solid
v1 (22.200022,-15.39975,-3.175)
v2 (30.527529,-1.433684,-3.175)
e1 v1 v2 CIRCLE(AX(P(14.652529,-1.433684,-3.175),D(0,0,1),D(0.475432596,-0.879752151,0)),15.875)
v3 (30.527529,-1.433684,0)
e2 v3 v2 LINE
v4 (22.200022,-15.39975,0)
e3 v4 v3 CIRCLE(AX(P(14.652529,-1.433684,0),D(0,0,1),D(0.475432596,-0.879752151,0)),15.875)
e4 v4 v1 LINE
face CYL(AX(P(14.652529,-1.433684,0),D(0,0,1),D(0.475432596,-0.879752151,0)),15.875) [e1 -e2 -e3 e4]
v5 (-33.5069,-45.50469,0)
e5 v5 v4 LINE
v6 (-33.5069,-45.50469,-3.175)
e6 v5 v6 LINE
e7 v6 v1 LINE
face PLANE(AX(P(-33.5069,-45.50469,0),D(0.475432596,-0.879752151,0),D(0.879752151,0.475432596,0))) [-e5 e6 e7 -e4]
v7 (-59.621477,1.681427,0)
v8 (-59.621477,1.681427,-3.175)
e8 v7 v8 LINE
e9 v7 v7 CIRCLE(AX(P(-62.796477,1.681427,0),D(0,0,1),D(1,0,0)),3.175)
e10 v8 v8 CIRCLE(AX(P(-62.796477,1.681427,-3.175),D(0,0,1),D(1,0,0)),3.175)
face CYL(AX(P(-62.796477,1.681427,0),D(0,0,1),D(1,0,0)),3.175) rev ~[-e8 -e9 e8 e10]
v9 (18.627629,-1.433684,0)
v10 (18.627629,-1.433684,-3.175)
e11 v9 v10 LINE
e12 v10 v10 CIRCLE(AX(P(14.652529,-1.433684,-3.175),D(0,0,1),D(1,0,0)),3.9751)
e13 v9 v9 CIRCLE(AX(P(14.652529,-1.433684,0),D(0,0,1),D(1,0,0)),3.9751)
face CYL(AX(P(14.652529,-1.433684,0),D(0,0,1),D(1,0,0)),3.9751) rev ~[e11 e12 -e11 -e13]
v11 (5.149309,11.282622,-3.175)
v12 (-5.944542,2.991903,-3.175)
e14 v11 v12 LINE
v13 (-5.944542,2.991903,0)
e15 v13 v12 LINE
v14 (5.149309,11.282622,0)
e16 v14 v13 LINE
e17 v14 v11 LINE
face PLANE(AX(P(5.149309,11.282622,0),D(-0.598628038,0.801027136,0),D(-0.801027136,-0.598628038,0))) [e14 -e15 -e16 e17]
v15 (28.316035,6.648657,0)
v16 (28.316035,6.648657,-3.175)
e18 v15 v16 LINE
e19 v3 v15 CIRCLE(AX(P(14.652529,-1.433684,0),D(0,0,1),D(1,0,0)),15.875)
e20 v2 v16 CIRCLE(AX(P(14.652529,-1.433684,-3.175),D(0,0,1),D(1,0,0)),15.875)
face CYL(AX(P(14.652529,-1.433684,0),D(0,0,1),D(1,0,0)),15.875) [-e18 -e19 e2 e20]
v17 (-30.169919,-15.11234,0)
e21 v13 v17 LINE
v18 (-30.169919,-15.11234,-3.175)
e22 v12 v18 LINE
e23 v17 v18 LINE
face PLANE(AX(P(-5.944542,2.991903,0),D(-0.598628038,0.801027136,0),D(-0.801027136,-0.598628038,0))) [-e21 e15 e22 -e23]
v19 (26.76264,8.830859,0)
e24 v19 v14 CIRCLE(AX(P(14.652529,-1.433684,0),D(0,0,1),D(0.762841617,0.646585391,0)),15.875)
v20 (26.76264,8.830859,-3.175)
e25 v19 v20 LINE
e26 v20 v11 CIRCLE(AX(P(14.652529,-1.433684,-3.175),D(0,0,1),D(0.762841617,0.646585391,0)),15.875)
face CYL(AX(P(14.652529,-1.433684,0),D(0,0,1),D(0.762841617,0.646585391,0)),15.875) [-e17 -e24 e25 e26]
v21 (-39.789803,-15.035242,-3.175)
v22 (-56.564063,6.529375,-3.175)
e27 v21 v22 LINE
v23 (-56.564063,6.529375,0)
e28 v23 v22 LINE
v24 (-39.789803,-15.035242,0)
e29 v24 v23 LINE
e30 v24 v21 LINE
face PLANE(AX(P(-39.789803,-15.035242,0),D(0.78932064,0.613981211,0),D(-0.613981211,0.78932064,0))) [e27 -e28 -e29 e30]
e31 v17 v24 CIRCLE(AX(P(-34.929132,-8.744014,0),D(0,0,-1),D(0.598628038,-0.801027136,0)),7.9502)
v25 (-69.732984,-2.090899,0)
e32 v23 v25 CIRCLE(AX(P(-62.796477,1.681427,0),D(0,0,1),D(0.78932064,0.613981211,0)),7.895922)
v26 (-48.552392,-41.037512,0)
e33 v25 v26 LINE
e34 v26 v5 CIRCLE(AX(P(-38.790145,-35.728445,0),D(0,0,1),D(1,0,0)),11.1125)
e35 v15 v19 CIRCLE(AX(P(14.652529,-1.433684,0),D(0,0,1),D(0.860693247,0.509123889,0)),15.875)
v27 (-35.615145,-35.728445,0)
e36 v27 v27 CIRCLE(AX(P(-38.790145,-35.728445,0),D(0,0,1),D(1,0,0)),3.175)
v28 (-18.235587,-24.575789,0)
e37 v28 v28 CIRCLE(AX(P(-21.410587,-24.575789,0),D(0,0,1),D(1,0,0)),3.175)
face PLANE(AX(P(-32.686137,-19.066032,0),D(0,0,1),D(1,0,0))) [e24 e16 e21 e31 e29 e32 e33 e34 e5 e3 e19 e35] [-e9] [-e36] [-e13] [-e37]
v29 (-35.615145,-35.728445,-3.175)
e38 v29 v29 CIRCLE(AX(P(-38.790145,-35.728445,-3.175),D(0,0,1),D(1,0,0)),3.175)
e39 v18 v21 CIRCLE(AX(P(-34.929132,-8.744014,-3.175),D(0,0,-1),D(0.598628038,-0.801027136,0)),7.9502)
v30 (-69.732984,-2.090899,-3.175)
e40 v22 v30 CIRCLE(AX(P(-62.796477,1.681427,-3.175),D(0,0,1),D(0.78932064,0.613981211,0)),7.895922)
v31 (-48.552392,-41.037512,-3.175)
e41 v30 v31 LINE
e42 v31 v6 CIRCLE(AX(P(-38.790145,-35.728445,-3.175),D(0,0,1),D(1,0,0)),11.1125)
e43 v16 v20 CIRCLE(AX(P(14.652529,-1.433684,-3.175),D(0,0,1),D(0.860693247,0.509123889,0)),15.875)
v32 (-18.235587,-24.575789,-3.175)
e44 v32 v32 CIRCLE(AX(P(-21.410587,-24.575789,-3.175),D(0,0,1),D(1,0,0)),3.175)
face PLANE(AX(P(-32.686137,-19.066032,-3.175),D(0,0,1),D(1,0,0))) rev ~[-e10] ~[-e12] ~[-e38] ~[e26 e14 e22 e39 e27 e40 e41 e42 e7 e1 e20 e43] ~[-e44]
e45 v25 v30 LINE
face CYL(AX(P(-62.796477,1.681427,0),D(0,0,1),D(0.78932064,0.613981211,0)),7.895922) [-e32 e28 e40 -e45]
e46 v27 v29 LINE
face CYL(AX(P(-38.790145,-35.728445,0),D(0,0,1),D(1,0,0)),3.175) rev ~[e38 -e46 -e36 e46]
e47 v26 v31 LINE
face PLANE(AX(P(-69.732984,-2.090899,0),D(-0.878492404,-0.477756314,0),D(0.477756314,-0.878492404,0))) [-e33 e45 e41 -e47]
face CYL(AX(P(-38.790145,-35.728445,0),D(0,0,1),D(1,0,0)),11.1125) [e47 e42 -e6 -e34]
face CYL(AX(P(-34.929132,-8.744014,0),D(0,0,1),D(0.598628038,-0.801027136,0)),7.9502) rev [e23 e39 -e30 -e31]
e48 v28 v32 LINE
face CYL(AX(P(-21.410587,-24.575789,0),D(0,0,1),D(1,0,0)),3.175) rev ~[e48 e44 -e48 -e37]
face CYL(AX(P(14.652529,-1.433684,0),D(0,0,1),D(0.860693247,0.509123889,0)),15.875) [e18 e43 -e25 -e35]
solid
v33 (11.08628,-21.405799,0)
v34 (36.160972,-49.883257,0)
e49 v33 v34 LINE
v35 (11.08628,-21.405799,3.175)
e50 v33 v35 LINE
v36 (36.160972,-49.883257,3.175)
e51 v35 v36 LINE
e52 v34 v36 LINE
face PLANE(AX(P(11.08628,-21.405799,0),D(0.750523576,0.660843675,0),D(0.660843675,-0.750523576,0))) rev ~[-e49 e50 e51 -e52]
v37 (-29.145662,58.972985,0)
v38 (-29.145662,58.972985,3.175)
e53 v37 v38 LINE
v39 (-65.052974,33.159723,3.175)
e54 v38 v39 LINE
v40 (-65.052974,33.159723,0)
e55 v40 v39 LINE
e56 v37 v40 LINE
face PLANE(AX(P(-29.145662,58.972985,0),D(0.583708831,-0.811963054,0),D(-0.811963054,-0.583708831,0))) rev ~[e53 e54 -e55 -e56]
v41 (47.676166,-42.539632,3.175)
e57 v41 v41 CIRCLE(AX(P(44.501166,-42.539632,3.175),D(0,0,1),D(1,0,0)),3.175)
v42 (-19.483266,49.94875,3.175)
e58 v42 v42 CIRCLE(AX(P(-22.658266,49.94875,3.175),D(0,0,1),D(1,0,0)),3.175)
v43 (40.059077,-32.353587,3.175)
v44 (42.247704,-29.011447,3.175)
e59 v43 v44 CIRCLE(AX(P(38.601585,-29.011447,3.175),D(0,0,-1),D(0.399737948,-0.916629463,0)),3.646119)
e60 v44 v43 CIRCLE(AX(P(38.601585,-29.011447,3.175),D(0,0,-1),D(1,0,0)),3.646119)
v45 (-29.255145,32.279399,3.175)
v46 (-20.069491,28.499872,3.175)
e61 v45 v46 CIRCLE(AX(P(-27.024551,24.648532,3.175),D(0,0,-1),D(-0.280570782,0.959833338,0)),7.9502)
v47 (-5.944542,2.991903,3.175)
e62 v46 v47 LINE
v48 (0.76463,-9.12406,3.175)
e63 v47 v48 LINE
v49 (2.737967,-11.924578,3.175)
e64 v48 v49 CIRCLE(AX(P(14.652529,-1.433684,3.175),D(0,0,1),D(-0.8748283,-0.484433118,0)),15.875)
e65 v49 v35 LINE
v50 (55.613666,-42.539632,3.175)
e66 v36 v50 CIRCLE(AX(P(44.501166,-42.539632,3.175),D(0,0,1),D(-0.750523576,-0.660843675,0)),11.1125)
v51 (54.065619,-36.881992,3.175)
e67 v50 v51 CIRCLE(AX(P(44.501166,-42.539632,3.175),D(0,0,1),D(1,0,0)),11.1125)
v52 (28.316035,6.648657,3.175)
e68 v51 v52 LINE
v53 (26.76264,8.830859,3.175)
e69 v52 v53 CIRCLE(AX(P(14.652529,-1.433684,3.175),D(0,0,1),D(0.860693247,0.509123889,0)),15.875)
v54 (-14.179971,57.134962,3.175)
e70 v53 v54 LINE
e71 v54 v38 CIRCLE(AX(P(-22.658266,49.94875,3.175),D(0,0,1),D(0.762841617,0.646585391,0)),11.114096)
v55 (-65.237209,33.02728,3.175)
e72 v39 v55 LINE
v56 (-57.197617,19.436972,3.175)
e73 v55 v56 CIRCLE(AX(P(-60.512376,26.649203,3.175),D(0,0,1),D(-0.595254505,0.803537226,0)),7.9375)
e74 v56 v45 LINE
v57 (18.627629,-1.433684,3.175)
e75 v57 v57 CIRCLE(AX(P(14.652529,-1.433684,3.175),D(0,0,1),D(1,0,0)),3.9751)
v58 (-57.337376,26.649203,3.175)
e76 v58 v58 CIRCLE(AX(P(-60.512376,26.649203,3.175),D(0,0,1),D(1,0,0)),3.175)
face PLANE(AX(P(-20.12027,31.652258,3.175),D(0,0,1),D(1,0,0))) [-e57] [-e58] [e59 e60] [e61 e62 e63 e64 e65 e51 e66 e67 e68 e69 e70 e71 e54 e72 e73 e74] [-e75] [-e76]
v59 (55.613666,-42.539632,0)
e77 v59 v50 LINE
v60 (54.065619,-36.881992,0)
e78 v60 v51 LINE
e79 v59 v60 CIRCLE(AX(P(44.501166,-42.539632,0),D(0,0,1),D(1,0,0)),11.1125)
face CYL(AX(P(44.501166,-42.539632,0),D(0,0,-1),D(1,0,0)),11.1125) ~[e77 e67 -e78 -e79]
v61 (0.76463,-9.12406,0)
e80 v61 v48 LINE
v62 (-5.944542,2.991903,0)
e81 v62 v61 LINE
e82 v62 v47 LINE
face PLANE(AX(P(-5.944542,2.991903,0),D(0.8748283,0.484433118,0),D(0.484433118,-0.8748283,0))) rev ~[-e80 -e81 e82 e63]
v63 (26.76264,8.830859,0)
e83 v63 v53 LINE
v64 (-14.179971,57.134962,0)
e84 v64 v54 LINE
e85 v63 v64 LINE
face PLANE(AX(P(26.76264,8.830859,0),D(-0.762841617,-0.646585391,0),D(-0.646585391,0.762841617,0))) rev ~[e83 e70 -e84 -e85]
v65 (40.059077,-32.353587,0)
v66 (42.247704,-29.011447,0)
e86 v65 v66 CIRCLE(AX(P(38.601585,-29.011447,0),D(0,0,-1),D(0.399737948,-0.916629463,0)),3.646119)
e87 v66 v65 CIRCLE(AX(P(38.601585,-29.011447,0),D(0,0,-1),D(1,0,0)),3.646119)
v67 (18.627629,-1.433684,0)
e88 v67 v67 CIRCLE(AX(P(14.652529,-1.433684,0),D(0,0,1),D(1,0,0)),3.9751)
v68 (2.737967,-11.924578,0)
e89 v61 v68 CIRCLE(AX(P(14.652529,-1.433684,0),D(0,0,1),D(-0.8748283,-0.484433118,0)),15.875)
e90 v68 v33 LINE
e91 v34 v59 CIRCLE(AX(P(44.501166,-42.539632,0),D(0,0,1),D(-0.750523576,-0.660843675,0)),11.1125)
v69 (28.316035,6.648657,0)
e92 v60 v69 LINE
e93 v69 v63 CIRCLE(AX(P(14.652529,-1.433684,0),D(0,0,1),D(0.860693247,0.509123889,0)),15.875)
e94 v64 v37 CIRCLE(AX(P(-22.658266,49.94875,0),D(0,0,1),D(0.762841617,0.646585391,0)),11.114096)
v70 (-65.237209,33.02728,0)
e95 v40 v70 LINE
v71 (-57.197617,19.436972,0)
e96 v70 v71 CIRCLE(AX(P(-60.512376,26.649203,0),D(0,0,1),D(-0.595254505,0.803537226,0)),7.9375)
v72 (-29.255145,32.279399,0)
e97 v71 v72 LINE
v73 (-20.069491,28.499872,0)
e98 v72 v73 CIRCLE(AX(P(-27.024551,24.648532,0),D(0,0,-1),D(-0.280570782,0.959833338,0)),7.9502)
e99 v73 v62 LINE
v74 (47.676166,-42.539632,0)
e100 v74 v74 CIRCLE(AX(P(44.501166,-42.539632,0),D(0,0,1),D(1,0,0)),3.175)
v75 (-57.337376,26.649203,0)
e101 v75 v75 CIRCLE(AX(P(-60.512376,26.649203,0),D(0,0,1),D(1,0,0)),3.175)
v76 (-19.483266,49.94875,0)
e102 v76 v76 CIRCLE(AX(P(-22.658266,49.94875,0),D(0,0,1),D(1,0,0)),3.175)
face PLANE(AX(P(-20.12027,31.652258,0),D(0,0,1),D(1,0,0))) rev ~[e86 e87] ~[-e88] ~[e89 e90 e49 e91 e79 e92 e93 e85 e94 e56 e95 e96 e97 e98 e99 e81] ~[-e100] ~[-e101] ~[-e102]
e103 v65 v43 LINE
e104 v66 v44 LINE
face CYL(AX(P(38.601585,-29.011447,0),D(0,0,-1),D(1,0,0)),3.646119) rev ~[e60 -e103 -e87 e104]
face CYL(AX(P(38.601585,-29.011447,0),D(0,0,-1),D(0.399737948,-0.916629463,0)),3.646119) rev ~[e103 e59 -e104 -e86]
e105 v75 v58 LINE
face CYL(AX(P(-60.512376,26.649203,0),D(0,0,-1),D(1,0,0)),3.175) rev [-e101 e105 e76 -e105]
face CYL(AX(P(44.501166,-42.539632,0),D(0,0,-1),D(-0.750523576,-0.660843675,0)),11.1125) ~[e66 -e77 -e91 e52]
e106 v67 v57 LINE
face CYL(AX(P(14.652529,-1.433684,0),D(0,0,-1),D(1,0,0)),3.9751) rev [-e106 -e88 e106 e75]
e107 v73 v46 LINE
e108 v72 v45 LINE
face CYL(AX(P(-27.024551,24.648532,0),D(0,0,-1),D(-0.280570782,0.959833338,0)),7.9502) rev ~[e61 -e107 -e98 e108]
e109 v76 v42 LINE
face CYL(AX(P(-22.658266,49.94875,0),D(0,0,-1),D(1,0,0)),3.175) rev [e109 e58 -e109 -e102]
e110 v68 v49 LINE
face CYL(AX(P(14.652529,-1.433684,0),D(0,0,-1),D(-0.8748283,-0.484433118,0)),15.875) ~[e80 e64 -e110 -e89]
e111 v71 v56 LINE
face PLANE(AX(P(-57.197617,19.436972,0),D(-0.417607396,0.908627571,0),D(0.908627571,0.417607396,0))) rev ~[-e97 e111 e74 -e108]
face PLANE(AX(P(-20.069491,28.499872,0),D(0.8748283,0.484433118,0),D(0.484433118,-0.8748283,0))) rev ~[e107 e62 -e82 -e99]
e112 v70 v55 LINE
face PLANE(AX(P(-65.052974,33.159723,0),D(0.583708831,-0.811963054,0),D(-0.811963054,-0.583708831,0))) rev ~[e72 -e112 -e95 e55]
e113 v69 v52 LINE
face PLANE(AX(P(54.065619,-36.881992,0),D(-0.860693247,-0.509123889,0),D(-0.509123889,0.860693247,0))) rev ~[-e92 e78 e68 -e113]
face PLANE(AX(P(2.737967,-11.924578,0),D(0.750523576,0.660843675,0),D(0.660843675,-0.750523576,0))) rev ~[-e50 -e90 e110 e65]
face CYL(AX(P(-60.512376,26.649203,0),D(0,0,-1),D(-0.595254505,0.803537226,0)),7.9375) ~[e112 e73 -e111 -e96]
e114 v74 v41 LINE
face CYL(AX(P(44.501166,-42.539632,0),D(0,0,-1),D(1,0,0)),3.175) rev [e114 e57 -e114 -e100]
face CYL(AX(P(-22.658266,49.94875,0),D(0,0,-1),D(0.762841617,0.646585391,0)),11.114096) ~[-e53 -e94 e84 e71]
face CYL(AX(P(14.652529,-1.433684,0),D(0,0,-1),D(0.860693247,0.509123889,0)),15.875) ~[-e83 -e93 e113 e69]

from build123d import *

# Parameters (mm, degrees)
F0_R     = 3.9751
F0_R_2   = 3.175
F1_DEPTH = 3.175
F2_DEPTH = 3.175


# Not quite as in the source:
# - a feature names something its author has since deleted; it is built from what else it names


with BuildPart() as f1:
    # F0 (on Top) → F1 (new body)
    with BuildSketch(Plane.XY):
        with BuildLine():
            ThreePointArc((-52.5748759492, 26.6492032122), (-53.8297565711, 22.3659212349), (-57.1976172398, 19.436971869))
            Line((-57.1976172398, 19.436971869), (-29.2551448321, 32.2793987644))
            ThreePointArc((-29.2551448321, 32.2793987644), (-23.9994310398, 32.0006966991), (-20.0694910529, 28.4998719382))
            Line((-20.0694910529, 28.4998719382), (-5.944542276, 2.9919030157))
            Line((-5.944542276, 2.9919030157), (5.1493091314, 11.2826215199))
            ThreePointArc((5.1493091314, 11.2826215199), (16.4418739956, 14.3401507274), (26.7626398944, 8.830858819))
            Line((26.7626398944, 8.830858819), (-14.1799710904, 57.1349621747))
            ThreePointArc((-14.1799710904, 57.1349621747), (-12.2239065675, 53.7759255754), (-11.5441699975, 49.9487499211))
            ThreePointArc((-11.5441699975, 49.9487499211), (-27.7288475633, 40.0587377986), (-29.1456623364, 58.9729854334))
            Line((-29.1456623364, 58.9729854334), (-65.0529744577, 33.1597232709))
            ThreePointArc((-65.0529744577, 33.1597232709), (-56.8406661575, 33.6864223686), (-52.5748759492, 26.6492032122))
        make_face()
        with BuildLine():
            Line((54.0656193027, -36.8819923981), (28.3160345311, 6.6486574689))
            ThreePointArc((28.3160345311, 6.6486574689), (29.9646775383, 2.7560340053), (30.5275292295, -1.4336842631))
            ThreePointArc((30.5275292295, -1.4336842631), (28.2876322337, -9.5638497635), (22.2000216938, -15.3997496539))
            Line((22.2000216938, -15.3997496539), (11.0862799953, -21.4057992729))
            Line((11.0862799953, -21.4057992729), (36.1609723562, -49.8832569445))
            ThreePointArc((36.1609723562, -49.8832569445), (33.6536306121, -40.1274456475), (40.059076729, -32.3535870991))
            ThreePointArc((40.059076729, -32.3535870991), (47.9196841374, -31.9660141026), (54.0656193027, -36.8819923981))
        make_face()
        with BuildLine():
            ThreePointArc((42.2477037346, -29.0114467929), (41.6518612023, -31.0089446024), (40.059076729, -32.3535870991))
            ThreePointArc((40.059076729, -32.3535870991), (35.5513078202, -27.0139489834), (42.2477037346, -29.0114467929))
        make_face(mode=Mode.SUBTRACT)
        with BuildLine():
            ThreePointArc((28.3160345311, 6.6486574689), (27.5854454003, 7.7725801433), (26.7626398944, 8.830858819))
            ThreePointArc((26.7626398944, 8.830858819), (16.4418739956, 14.3401507274), (5.1493091314, 11.2826215199))
            ThreePointArc((5.1493091314, 11.2826215199), (-0.8682400489, 1.9011839514), (0.7646299709, -9.1240600136))
            ThreePointArc((0.7646299709, -9.1240600136), (1.6755313717, -10.5777069884), (2.7379674647, -11.9245775975))
            ThreePointArc((2.7379674647, -11.9245775975), (11.8620044089, -17.0614990888), (22.2000216938, -15.3997496539))
            ThreePointArc((22.2000216938, -15.3997496539), (28.2876322337, -9.5638497635), (30.5275292295, -1.4336842631))
            ThreePointArc((30.5275292295, -1.4336842631), (29.9646775383, 2.7560340053), (28.3160345311, 6.6486574689))
        make_face()
        with Locations((14.6525292295, -1.4336842631)):
            Circle(F0_R, mode=Mode.SUBTRACT)
        with BuildLine():
            ThreePointArc((55.6136655916, -42.5396316105), (55.2196694077, -39.6068288226), (54.0656193027, -36.8819923981))
            ThreePointArc((54.0656193027, -36.8819923981), (47.9196841374, -31.9660141026), (40.059076729, -32.3535870991))
            ThreePointArc((40.059076729, -32.3535870991), (33.6536306121, -40.1274456475), (36.1609723562, -49.8832569445))
            ThreePointArc((36.1609723562, -49.8832569445), (48.4259113746, -52.9359784106), (55.6136655916, -42.5396316105))
        make_face()
        with Locations((44.5011655916, -42.5396316105)):
            Circle(F0_R_2, mode=Mode.SUBTRACT)
        with BuildLine():
            Line((5.1493091314, 11.2826215199), (-5.944542276, 2.9919030157))
            Line((-5.944542276, 2.9919030157), (0.7646299709, -9.1240600136))
            ThreePointArc((0.7646299709, -9.1240600136), (-0.8682400489, 1.9011839514), (5.1493091314, 11.2826215199))
        make_face()
        with BuildLine():
            ThreePointArc((22.2000216938, -15.3997496539), (11.8620044089, -17.0614990888), (2.7379674647, -11.9245775975))
            Line((2.7379674647, -11.9245775975), (11.0862799953, -21.4057992729))
            Line((11.0862799953, -21.4057992729), (22.2000216938, -15.3997496539))
        make_face()
        with BuildLine():
            ThreePointArc((-14.1799710904, 57.1349621747), (-21.3034591884, 60.9799616773), (-29.1456623364, 58.9729854334))
            ThreePointArc((-29.1456623364, 58.9729854334), (-27.7288475633, 40.0587377986), (-11.5441699975, 49.9487499211))
            ThreePointArc((-11.5441699975, 49.9487499211), (-12.2239065675, 53.7759255754), (-14.1799710904, 57.1349621747))
        make_face()
        with Locations((-22.6582662231, 49.9487499211)):
            Circle(F0_R_2, mode=Mode.SUBTRACT)
        with BuildLine():
            Line((-65.0529744577, 33.1597232709), (-65.2372085825, 33.0272799472))
            ThreePointArc((-65.2372085825, 33.0272799472), (-67.3440079309, 22.6078283574), (-57.1976172398, 19.436971869))
            ThreePointArc((-57.1976172398, 19.436971869), (-53.8297565711, 22.3659212349), (-52.5748759492, 26.6492032122))
            ThreePointArc((-52.5748759492, 26.6492032122), (-56.8406661575, 33.6864223686), (-65.0529744577, 33.1597232709))
        make_face()
        with Locations((-60.5123759492, 26.6492032122)):
            Circle(F0_R_2, mode=Mode.SUBTRACT)
    extrude(amount=F1_DEPTH)


with BuildPart() as f2:
    # F0 (on Top) → F2 (new body)
    with BuildSketch(Plane.XY):
        with BuildLine():
            Line((0.7646299709, -9.1240600136), (-5.944542276, 2.9919030157))
            Line((-5.944542276, 2.9919030157), (-30.1699189245, -15.1123396928))
            ThreePointArc((-30.1699189245, -15.1123396928), (-34.9928458304, -16.6939584439), (-39.7898032928, -15.0352417962))
            Line((-39.7898032928, -15.0352417962), (-56.5640629887, 6.5293747809))
            ThreePointArc((-56.5640629887, 6.5293747809), (-55.3280021129, 4.2441334268), (-54.9005552207, 1.6814271055))
            ThreePointArc((-54.9005552207, 1.6814271055), (-60.8502677302, -5.9708830942), (-69.7329844925, -2.090899427))
            Line((-69.7329844925, -2.090899427), (-48.5523916303, -41.0375117468))
            ThreePointArc((-48.5523916303, -41.0375117468), (-41.5291855152, -24.9587969806), (-27.6776447878, -35.7284447066))
            ThreePointArc((-27.6776447878, -35.7284447066), (-29.2455726849, -41.419560557), (-33.5069000628, -45.5046904802))
            Line((-33.5069000628, -45.5046904802), (11.0862799953, -21.4057992729))
            Line((11.0862799953, -21.4057992729), (2.7379674647, -11.9245775975))
            ThreePointArc((2.7379674647, -11.9245775975), (1.6755313717, -10.5777069884), (0.7646299709, -9.1240600136))
        make_face()
        with Locations((-21.4105871974, -24.5757886104)):
            Circle(F0_R_2, mode=Mode.SUBTRACT)
        with BuildLine():
            ThreePointArc((-54.9005552207, 1.6814271055), (-55.3280021129, 4.2441334268), (-56.5640629887, 6.5293747809))
            ThreePointArc((-56.5640629887, 6.5293747809), (-67.1209676687, 8.2878151961), (-69.7329844925, -2.090899427))
            ThreePointArc((-69.7329844925, -2.090899427), (-60.8502677302, -5.9708830942), (-54.9005552207, 1.6814271055))
        make_face()
        with Locations((-62.7964770983, 1.6814271055)):
            Circle(F0_R_2, mode=Mode.SUBTRACT)
        with BuildLine():
            ThreePointArc((-48.5523916303, -41.0375117468), (-41.9531001228, -46.3813020604), (-33.5069000628, -45.5046904802))
            ThreePointArc((-33.5069000628, -45.5046904802), (-29.2455726849, -41.419560557), (-27.6776447878, -35.7284447066))
            ThreePointArc((-27.6776447878, -35.7284447066), (-41.5291855152, -24.9587969806), (-48.5523916303, -41.0375117468))
        make_face()
        with Locations((-38.7901447878, -35.7284447066)):
            Circle(F0_R_2, mode=Mode.SUBTRACT)
        with BuildLine():
            Line((5.1493091314, 11.2826215199), (-5.944542276, 2.9919030157))
            Line((-5.944542276, 2.9919030157), (0.7646299709, -9.1240600136))
            ThreePointArc((0.7646299709, -9.1240600136), (-0.8682400489, 1.9011839514), (5.1493091314, 11.2826215199))
        make_face()
        with BuildLine():
            ThreePointArc((22.2000216938, -15.3997496539), (11.8620044089, -17.0614990888), (2.7379674647, -11.9245775975))
            Line((2.7379674647, -11.9245775975), (11.0862799953, -21.4057992729))
            Line((11.0862799953, -21.4057992729), (22.2000216938, -15.3997496539))
        make_face()
        with BuildLine():
            ThreePointArc((28.3160345311, 6.6486574689), (27.5854454003, 7.7725801433), (26.7626398944, 8.830858819))
            ThreePointArc((26.7626398944, 8.830858819), (16.4418739956, 14.3401507274), (5.1493091314, 11.2826215199))
            ThreePointArc((5.1493091314, 11.2826215199), (-0.8682400489, 1.9011839514), (0.7646299709, -9.1240600136))
            ThreePointArc((0.7646299709, -9.1240600136), (1.6755313717, -10.5777069884), (2.7379674647, -11.9245775975))
            ThreePointArc((2.7379674647, -11.9245775975), (11.8620044089, -17.0614990888), (22.2000216938, -15.3997496539))
            ThreePointArc((22.2000216938, -15.3997496539), (28.2876322337, -9.5638497635), (30.5275292295, -1.4336842631))
            ThreePointArc((30.5275292295, -1.4336842631), (29.9646775383, 2.7560340053), (28.3160345311, 6.6486574689))
        make_face()
        with Locations((14.6525292295, -1.4336842631)):
            Circle(F0_R, mode=Mode.SUBTRACT)
    extrude(amount=-F2_DEPTH)


solid = Compound([f1.part, f2.part])
